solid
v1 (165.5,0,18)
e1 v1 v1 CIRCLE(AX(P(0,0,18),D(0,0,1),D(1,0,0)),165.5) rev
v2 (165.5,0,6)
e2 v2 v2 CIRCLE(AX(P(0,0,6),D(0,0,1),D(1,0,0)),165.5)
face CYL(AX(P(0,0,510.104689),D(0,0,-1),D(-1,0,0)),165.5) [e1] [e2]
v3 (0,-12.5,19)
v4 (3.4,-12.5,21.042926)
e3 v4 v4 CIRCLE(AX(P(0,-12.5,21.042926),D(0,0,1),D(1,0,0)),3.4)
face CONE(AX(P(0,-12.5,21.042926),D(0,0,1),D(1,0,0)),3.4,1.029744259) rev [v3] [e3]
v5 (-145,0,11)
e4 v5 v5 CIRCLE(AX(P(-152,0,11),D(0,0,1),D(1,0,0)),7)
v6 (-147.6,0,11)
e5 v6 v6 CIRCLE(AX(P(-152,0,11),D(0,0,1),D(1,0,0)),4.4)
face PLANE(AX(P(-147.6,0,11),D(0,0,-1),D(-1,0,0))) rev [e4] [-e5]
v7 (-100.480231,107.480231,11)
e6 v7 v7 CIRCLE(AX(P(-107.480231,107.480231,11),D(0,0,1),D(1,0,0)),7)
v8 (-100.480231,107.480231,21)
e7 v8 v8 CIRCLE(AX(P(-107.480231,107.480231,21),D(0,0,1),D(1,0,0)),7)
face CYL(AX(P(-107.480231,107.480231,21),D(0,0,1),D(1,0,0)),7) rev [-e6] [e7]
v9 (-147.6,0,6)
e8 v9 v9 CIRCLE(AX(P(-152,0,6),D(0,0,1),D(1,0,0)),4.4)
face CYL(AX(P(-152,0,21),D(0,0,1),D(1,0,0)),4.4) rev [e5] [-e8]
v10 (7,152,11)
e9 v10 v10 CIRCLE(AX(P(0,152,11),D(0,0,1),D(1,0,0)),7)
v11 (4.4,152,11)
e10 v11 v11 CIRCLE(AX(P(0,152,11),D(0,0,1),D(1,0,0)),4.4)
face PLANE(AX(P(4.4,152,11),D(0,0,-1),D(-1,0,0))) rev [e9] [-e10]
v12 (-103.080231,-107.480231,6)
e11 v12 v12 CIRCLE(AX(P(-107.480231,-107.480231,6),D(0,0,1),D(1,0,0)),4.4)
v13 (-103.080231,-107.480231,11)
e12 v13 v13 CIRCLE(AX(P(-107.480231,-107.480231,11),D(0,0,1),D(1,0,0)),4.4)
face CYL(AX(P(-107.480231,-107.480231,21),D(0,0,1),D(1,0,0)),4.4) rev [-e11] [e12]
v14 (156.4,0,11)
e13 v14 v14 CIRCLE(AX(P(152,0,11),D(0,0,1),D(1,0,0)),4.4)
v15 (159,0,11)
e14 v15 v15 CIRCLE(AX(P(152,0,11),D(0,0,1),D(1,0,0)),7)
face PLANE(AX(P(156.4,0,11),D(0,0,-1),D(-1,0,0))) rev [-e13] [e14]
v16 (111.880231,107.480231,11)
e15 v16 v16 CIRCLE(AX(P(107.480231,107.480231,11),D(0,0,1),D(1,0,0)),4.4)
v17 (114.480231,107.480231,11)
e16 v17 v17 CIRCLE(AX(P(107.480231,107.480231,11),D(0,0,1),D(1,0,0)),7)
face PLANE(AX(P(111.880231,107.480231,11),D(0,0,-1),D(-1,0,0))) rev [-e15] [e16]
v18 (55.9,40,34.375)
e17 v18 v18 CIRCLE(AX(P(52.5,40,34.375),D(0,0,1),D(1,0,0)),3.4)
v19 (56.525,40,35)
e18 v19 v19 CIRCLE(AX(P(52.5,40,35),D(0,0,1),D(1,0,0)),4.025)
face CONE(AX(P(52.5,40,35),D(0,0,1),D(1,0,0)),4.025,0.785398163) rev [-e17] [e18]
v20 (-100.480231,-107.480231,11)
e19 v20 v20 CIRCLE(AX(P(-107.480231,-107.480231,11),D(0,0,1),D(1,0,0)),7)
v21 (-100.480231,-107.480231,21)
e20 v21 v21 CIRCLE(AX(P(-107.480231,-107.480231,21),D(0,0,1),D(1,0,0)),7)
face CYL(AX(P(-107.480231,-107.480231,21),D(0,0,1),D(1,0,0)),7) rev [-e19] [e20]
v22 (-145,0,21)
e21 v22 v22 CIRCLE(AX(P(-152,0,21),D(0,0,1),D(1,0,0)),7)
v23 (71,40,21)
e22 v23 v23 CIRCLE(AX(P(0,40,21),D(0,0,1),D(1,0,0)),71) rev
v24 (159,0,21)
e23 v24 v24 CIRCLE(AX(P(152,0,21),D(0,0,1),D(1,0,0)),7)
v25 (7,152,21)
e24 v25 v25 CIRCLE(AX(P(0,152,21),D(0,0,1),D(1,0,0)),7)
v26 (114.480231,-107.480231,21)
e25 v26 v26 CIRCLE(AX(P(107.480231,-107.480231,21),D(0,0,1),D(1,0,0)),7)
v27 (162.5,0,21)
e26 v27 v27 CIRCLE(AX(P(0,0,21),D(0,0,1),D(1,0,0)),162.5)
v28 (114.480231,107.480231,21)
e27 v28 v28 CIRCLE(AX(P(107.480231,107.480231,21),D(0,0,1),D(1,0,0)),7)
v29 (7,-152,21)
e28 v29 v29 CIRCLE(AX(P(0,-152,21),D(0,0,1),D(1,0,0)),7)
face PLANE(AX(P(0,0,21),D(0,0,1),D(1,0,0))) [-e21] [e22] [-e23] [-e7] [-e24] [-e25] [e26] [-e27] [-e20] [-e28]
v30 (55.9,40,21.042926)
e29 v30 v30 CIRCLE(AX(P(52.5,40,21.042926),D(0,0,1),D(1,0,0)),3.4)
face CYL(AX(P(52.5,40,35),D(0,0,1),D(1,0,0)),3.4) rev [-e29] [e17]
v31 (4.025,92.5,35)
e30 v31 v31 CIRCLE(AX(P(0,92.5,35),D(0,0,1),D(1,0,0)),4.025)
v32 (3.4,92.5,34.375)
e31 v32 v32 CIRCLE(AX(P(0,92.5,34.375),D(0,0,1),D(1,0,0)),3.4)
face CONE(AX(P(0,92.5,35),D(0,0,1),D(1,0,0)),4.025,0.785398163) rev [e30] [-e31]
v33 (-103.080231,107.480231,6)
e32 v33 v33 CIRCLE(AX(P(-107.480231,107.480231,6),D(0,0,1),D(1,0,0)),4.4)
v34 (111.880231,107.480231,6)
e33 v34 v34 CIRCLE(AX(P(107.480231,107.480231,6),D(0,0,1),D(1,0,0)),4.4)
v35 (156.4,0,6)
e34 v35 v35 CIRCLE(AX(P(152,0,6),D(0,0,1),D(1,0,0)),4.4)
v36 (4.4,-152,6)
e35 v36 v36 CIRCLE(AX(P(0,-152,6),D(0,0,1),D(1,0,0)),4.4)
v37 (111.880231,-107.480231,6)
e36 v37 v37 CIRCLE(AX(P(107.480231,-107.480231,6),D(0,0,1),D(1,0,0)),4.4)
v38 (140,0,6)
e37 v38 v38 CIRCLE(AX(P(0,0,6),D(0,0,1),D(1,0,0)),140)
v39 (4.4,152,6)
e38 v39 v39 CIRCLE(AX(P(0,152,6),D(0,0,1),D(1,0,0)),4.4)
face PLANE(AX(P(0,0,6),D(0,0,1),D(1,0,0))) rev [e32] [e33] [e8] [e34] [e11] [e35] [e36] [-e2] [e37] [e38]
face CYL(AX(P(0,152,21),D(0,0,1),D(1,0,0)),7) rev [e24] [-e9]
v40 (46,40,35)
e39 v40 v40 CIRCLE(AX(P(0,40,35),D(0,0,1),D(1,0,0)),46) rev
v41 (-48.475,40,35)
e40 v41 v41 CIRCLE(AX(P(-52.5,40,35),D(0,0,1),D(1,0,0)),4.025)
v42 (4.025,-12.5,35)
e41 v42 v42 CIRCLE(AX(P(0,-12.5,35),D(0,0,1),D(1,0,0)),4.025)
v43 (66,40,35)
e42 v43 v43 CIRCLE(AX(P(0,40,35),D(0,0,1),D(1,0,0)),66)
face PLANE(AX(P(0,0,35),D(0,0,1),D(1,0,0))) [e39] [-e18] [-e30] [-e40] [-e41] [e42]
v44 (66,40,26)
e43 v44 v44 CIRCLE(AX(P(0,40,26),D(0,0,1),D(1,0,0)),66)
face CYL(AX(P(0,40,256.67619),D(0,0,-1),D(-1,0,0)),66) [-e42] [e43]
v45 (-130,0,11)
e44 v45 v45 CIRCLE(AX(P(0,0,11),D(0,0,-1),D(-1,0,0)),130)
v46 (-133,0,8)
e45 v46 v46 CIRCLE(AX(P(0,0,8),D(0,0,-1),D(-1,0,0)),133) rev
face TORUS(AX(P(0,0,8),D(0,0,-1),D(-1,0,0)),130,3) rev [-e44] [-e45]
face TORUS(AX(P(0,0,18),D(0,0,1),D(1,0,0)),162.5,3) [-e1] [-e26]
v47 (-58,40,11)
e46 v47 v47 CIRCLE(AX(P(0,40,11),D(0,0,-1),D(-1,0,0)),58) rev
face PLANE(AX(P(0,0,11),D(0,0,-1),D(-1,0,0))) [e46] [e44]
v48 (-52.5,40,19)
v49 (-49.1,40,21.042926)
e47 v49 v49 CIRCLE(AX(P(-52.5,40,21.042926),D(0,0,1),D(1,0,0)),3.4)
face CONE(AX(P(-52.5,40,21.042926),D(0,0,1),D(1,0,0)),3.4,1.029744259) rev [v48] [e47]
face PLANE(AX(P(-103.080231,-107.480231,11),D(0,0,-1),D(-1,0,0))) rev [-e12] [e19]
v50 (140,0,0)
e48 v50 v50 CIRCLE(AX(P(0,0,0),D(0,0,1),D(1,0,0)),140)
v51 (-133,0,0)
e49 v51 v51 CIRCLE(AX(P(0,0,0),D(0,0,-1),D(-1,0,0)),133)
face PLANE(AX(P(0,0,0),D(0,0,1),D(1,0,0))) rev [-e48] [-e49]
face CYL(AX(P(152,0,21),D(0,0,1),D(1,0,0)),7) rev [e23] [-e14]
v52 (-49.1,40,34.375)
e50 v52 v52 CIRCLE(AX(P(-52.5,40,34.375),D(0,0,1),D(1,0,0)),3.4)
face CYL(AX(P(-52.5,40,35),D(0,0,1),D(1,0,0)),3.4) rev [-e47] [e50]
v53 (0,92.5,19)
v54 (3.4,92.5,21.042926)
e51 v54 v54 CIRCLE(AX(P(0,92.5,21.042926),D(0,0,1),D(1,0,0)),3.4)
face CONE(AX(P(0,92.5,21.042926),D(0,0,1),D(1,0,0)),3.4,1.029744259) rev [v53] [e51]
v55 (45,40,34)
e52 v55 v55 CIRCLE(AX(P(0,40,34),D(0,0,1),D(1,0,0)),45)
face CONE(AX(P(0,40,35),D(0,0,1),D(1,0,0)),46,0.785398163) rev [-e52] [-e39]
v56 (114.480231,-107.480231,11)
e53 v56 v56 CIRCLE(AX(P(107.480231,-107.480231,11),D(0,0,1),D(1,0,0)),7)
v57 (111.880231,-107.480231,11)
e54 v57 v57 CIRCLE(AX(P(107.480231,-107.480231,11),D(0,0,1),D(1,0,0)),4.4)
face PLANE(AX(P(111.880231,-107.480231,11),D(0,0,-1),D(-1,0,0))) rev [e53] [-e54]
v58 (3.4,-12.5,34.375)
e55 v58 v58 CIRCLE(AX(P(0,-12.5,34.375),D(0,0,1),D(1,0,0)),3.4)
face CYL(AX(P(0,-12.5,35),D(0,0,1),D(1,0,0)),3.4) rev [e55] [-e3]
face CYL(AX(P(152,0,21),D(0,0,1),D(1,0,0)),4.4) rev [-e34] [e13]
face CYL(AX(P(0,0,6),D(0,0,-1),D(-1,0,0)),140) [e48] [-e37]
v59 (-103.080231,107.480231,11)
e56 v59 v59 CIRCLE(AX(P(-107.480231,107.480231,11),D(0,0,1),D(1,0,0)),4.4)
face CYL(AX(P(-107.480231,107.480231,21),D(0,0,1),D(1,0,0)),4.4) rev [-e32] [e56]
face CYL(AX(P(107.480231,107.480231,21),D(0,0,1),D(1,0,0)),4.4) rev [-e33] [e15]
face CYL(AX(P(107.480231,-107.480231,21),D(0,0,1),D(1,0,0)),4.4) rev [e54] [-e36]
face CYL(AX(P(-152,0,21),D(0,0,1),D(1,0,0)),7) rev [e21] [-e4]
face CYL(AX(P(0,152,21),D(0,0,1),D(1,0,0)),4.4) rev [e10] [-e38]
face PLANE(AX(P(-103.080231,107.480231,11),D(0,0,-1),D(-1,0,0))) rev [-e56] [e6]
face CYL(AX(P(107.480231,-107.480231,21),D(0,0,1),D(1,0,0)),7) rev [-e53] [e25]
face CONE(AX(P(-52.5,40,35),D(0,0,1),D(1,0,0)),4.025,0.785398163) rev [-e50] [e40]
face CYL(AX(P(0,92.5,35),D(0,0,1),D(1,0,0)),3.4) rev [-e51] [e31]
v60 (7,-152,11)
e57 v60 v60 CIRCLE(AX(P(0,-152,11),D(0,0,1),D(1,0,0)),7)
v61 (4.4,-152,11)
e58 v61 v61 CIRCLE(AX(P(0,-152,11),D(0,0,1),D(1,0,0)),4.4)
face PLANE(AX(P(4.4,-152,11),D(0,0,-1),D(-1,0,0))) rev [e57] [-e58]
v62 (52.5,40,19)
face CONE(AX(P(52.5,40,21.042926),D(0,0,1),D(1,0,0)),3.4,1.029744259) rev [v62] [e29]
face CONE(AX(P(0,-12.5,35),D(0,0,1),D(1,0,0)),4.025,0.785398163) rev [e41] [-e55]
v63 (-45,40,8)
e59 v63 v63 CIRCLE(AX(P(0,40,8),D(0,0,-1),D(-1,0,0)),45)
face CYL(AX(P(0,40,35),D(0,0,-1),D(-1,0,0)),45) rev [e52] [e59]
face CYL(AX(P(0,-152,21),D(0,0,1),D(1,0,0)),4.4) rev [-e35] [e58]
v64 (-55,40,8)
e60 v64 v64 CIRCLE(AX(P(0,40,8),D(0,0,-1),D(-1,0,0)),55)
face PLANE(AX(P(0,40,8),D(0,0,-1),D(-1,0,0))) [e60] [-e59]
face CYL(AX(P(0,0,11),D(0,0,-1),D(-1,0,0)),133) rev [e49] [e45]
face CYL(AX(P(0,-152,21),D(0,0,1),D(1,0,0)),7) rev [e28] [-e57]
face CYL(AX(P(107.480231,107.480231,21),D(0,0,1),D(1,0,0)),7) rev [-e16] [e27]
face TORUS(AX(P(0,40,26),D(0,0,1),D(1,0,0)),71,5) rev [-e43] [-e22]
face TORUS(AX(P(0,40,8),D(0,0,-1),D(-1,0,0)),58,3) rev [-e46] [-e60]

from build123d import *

# Parameters (mm, degrees)
SKETCH_1_R                   = 140
EXTRUDE_1_DEPTH              = 6
SKETCH_3_R                   = 165.5
EXTRUDE_2_DEPTH              = 15
SKETCH_4_R                   = 66
EXTRUDE_3_DEPTH              = 14
FILLET_1_R                   = 5
SKETCH_5_R                   = 133
CUT_EXTRUDE_1_DEPTH          = 11
SKETCH_6_R                   = 55
EXTRUDE_4_DEPTH              = 3
FILLET_2_R                   = 3
SKETCH_7_R                   = 45
CUT_EXTRUDE_2_DEPTH          = 236.604541552
CHAMFER_1_SIZE               = 1
HOLE_WIZARD_M8_1_D           = 6.8
HOLE_WIZARD_M8_1_DEPTH       = 13.957073895
HOLE_WIZARD_M8_1_CSINK_D     = 8.05
HOLE_WIZARD_M8_1_CSINK_ANGLE = 90
HOLE_WIZARD_M8_1_TIP         = 2.042926105
FILLET_3_R                   = 3
HOLE_WIZARD_1_D              = 8.8
HOLE_WIZARD_1_CBORE_D        = 14
HOLE_WIZARD_1_CBORE_DEPTH    = 10


with BuildPart() as part:
    # 草图1 → 凸台-拉伸1 (new body)
    with BuildSketch(Plane.XY):
        Circle(SKETCH_1_R)
    extrude(amount=EXTRUDE_1_DEPTH)

    # 草图3 → 凸台-拉伸2 (add)
    with BuildSketch(Plane.XY.offset(6)):
        Circle(SKETCH_3_R)
    extrude(amount=EXTRUDE_2_DEPTH)

    # 草图4 → 凸台-拉伸3 (add)
    with BuildSketch(Plane.XY.offset(21)):
        with Locations((0, 40)):
            Circle(SKETCH_4_R)
    extrude(amount=EXTRUDE_3_DEPTH)

    # 圆角1
    fillet_1_edges = [part.edges().sort_by_distance(p)[0] for p in [
        (-66, 40, 21),
    ]]
    fillet(fillet_1_edges, radius=FILLET_1_R)

    # 草图5 → 切除-拉伸1 (cut)
    with BuildSketch(Plane(origin=(0, 0, 0), x_dir=(-1, 0, 0), z_dir=(0, 0, -1))):
        Circle(SKETCH_5_R)
    extrude(amount=-CUT_EXTRUDE_1_DEPTH, mode=Mode.SUBTRACT)

    # 草图6 → 凸台-拉伸4 (add)
    with BuildSketch(Plane(origin=(0, 0, 11), x_dir=(-1, 0, 0), z_dir=(0, 0, -1))):
        with Locations((0, 40)):
            Circle(SKETCH_6_R)
    extrude(amount=EXTRUDE_4_DEPTH)

    # 圆角2
    fillet_2_edges = [part.edges().sort_by_distance(p)[0] for p in [
        (133, 0, 11),
        (55, 40, 11),
    ]]
    fillet(fillet_2_edges, radius=FILLET_2_R - 0.0001)  # a hair under: the kernel refuses the full size

    # 草图7 → 切除-拉伸2 (cut, through all)
    with BuildSketch(Plane(origin=(0, 0, 8), x_dir=(-1, 0, 0), z_dir=(0, 0, -1))):
        with Locations((0, 40)):
            Circle(SKETCH_7_R)
    extrude(amount=-CUT_EXTRUDE_2_DEPTH, mode=Mode.SUBTRACT)

    # 倒角1
    chamfer_1_edges = [part.edges().sort_by_distance(p)[0] for p in [
        (45, 40, 35),
    ]]
    chamfer(chamfer_1_edges, length=CHAMFER_1_SIZE)

    # M8 螺纹孔1
    with Locations(Plane.XY.offset(35)):
        with Locations((0, -12.5), (52.5, 40), (0, 92.5), (-52.5, 40)):
            CounterSinkHole(HOLE_WIZARD_M8_1_D / 2, HOLE_WIZARD_M8_1_CSINK_D / 2, depth=HOLE_WIZARD_M8_1_DEPTH, counter_sink_angle=HOLE_WIZARD_M8_1_CSINK_ANGLE)
            with Locations((0, 0, -(HOLE_WIZARD_M8_1_DEPTH + HOLE_WIZARD_M8_1_TIP / 2))):  # 118° drill point
                Cone(0, HOLE_WIZARD_M8_1_D / 2, HOLE_WIZARD_M8_1_TIP, mode=Mode.SUBTRACT)

    # 圆角3
    fillet_3_edges = [part.edges().sort_by_distance(p)[0] for p in [
        (-165.5, 0, 21),
    ]]
    fillet(fillet_3_edges, radius=FILLET_3_R)

    # 孔1 (through all)
    with Locations(Plane.XY.offset(21)):
        with Locations((107.48023074, 107.48023074), (152, 0), (107.48023074, -107.48023074), (0, -152), (-107.48023074, -107.48023074), (-152, 0), (-107.48023074, 107.48023074), (0, 152)):
            CounterBoreHole(HOLE_WIZARD_1_D / 2, HOLE_WIZARD_1_CBORE_D / 2, HOLE_WIZARD_1_CBORE_DEPTH)


solid = part.part
